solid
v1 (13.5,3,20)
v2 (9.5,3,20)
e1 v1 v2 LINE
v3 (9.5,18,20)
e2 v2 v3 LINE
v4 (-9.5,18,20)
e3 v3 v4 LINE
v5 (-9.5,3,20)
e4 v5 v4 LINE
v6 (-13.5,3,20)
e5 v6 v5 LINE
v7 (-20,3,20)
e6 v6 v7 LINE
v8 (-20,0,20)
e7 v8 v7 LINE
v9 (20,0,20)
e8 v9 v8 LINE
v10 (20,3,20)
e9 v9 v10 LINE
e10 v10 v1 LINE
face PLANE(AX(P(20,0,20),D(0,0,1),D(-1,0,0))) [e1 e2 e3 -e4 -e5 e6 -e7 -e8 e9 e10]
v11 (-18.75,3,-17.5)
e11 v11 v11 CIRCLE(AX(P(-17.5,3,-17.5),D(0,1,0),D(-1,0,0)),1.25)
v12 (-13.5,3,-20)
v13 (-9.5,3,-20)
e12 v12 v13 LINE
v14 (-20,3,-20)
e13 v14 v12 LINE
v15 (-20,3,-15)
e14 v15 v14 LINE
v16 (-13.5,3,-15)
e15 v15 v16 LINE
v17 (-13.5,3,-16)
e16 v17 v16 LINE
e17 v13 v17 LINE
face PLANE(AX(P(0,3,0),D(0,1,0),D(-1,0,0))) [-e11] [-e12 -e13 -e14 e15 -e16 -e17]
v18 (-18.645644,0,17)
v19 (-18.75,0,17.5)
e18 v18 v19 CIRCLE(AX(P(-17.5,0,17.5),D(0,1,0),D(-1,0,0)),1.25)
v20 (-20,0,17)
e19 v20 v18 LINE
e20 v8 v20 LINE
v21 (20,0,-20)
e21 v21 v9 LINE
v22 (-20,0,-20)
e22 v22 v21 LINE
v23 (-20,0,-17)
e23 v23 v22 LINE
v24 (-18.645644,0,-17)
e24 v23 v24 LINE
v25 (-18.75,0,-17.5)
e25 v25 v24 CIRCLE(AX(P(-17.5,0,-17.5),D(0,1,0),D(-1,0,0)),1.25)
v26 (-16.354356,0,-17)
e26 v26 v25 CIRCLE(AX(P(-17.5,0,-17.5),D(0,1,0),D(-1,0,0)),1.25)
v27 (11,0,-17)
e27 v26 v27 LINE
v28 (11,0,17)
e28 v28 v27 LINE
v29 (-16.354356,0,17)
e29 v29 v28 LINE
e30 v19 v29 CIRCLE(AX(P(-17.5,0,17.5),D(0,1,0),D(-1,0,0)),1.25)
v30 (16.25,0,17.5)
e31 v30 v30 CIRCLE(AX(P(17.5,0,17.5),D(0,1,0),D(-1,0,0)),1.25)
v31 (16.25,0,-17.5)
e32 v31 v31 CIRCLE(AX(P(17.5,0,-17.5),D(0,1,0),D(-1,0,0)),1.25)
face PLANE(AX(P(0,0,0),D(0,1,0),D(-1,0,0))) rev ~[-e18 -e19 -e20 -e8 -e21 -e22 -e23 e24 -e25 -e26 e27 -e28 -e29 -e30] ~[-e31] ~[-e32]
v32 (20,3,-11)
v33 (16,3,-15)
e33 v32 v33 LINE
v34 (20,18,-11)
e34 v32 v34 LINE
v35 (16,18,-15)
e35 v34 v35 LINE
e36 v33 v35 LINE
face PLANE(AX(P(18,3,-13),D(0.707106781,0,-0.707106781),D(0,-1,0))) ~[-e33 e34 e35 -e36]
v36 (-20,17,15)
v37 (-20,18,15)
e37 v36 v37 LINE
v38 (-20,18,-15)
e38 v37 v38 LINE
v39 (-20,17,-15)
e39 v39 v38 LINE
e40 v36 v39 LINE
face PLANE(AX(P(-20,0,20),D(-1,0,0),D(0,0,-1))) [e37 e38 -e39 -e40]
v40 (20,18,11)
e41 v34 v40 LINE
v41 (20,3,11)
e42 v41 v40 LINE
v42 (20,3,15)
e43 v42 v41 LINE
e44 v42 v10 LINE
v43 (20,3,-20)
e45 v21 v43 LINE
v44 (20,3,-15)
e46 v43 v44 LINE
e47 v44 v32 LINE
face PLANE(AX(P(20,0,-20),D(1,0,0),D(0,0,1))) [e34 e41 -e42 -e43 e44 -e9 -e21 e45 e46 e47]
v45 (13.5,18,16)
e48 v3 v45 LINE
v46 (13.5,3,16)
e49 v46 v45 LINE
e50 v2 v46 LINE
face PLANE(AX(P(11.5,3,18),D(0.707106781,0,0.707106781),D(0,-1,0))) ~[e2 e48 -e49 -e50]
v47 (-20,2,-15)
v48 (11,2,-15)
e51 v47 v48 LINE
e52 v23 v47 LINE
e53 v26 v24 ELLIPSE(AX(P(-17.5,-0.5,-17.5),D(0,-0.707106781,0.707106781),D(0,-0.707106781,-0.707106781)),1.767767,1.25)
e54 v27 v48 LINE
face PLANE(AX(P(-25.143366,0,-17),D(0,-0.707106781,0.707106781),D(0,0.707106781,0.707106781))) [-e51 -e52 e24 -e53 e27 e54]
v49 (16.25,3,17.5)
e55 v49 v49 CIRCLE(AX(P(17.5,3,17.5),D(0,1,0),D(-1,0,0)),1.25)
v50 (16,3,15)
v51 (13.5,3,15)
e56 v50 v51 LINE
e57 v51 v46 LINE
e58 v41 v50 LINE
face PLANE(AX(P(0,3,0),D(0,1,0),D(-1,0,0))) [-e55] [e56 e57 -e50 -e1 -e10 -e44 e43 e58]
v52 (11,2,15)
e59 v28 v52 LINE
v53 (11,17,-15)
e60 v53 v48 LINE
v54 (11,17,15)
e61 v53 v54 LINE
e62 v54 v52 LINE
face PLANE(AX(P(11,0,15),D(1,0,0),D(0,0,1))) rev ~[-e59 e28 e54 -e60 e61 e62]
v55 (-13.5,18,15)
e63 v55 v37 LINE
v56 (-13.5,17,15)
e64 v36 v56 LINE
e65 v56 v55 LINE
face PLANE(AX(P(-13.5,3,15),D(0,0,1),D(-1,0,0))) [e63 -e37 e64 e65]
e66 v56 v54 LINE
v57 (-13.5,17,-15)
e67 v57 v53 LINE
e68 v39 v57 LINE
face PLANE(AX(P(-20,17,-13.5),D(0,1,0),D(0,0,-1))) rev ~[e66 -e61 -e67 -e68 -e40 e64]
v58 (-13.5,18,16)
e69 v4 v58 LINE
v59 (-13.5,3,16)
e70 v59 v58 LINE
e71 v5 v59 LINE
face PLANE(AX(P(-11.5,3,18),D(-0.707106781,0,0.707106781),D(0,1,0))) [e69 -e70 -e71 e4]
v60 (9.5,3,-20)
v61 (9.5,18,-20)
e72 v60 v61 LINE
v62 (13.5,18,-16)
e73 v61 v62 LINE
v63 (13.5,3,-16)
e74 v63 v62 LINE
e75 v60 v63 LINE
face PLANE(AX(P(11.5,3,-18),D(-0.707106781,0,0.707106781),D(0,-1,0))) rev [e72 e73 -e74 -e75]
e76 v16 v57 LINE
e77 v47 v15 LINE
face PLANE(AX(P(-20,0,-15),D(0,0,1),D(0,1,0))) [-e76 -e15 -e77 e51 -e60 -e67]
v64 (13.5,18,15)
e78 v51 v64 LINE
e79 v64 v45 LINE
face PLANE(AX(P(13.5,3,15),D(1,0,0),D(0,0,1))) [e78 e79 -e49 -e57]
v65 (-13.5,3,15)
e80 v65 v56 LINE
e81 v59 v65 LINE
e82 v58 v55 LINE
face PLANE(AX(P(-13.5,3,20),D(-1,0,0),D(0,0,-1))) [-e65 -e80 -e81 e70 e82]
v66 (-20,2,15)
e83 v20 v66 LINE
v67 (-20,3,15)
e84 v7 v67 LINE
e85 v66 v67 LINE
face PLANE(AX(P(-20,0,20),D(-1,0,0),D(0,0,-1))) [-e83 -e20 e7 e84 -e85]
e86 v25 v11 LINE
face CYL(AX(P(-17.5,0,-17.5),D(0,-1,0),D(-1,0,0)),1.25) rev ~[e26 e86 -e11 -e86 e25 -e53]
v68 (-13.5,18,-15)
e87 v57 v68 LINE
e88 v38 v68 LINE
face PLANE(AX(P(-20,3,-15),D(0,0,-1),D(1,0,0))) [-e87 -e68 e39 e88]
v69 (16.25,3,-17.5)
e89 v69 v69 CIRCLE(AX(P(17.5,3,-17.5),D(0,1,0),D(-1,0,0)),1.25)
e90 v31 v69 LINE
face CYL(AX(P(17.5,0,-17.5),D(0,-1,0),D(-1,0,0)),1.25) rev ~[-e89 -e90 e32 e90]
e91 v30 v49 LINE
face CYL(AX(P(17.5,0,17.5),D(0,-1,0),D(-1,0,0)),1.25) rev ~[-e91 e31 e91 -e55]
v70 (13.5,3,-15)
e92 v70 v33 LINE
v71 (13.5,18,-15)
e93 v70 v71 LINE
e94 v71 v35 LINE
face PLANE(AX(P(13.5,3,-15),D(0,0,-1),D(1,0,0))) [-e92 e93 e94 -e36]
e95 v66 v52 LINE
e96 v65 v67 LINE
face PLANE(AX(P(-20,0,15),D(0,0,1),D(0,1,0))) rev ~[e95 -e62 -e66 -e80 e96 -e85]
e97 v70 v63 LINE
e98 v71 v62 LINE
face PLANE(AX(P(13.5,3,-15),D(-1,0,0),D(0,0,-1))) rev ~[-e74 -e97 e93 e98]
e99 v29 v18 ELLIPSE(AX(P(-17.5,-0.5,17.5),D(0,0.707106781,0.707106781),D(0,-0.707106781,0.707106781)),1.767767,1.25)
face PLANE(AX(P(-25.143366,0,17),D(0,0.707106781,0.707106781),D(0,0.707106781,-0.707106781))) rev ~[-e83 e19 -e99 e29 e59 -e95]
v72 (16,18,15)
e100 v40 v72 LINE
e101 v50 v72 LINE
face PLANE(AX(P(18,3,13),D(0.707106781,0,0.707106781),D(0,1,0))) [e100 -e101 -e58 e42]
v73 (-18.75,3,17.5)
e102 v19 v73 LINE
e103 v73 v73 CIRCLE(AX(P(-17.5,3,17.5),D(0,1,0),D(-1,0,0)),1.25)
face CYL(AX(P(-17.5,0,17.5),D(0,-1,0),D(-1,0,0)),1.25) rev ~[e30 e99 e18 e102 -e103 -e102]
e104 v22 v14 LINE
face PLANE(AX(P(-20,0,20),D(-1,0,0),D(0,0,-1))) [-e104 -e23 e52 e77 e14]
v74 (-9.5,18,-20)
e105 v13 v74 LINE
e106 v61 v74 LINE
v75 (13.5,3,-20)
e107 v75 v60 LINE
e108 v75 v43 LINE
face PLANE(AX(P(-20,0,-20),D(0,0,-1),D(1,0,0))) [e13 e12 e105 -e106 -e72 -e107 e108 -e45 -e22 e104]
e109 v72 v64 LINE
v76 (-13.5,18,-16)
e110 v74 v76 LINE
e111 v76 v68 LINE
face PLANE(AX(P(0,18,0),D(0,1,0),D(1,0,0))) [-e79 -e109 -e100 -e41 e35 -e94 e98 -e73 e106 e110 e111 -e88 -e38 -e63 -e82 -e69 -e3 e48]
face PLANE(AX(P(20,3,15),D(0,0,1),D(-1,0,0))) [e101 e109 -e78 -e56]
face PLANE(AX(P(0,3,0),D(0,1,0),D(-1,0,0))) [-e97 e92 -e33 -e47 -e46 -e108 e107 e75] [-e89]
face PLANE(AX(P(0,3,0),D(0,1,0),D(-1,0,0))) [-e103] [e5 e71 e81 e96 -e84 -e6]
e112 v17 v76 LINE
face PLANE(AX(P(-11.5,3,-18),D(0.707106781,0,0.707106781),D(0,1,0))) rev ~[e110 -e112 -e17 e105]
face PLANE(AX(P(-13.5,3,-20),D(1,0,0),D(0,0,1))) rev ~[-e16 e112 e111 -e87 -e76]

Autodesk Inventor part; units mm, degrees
ref_plane "YZ Plane" through (0, 0, 0) normal (1, 0, 0) x (0, 1, 0)
ref_plane "XZ Plane" through (0, 0, 0) normal (0, 1, 0) x (-1, 0, 0)
ref_plane "XY Plane" through (0, 0, 0) normal (0, 0, 1) x (1, 0, 0)
sketch "Sketch1" plane through (0, 0, 0) normal (0, 1, 0) x (-1, 0, 0)
  line L0 (-17.5, 17.5) -> (17.5, -17.5) construction
  line L1 (17.5, 17.5) -> (-17.5, -17.5) construction
  circle A0 centre (17.5, 17.5) radius 1.25
  circle A1 centre (-17.5, 17.5) radius 1.25
  circle A2 centre (17.5, -17.5) radius 1.25
  circle A3 centre (-17.5, -17.5) radius 1.25
  line L2 (-20, 20) -> (20, 20)
  line L3 (20, 20) -> (20, -20)
  line L4 (20, -20) -> (-20, -20)
  line L5 (-20, -20) -> (-20, 20)
  line L6 (-20, 20) -> (20, -20) construction
  line L7 (20, 20) -> (-20, -20) construction
  point P0 (0, 0)
  dimension "d0" = 35
  dimension "d1" = 35
  dimension "d2" = 2.5
  dimension "d3" = 2.5
  dimension "d4" = 2.5
  dimension "d5" = 2.5
  dimension "d6" = 40
  dimension "d7" = 40
extrude "Extrusion2" add sketch "Sketch1" along normal blind 3
sketch "Sketch2" plane through (0, 3, 0) normal (0, 1, 0) x (1, 0, 0)
  line L0 (20, -15) -> (-20, -15)
  line L1 (-20, -15) -> (-20, 15)
  line L2 (-20, 15) -> (20, 15)
  line L3 (20, 15) -> (20, -15)
  line L4 (20, -15) -> (-20, 15) construction
  line L5 (-20, -15) -> (20, 15) construction
  line L6 (-13.5, 10) -> (13.5, 10)
  line L7 (13.5, 10) -> (13.5, 20)
  line L8 (13.5, 20) -> (-13.5, 20)
  line L9 (-13.5, 20) -> (-13.5, 10)
  line L10 (-13.5, 10) -> (13.5, 20) construction
  line L11 (13.5, 10) -> (-13.5, 20) construction
  line L12 (-13.5, -10) -> (13.5, -10)
  line L13 (13.5, -10) -> (13.5, -20)
  line L14 (13.5, -20) -> (-13.5, -20)
  line L15 (-13.5, -20) -> (-13.5, -10)
  line L16 (-13.5, -10) -> (13.5, -20) construction
  line L17 (13.5, -10) -> (-13.5, -20) construction
  point P0 (0, 0)
  point P1 (0, 15)
  point P2 (0, -15)
  point P3 (13.5, -15)
  point P4 (-13.5, -15)
  point P5 (-13.5, 15)
  point P6 (13.5, 15)
  dimension "d12" = 40
  dimension "d13" = 30
  dimension "d27" = 27
  dimension "d28" = 10
  dimension "d29" = 27
  dimension "d30" = 10
extrude "Extrusion3" add sketch "Sketch2" along normal blind 15
sketch "Sketch4" plane through (-20, 0, -20) normal (-1, 0, 0) x (0, 0, 1)
  line L0 (0, 0) -> (40, 0) projected
  line L1 (40, 0) -> (40, 3) projected
  line L2 (35, 3) -> (40, 3) projected
  line L3 (35, 3) -> (35, 18) projected
  line L4 (5, 18) -> (35, 18) projected
  line L5 (5, 3) -> (5, 18) projected
  line L6 (0, 3) -> (5, 3) projected
  line L7 (0, 0) -> (0, 3) projected
  line L8 (33.5, -17) -> (6.5, -17)
  line L9 (6.5, -17) -> (6.5, 17)
  line L10 (6.5, 17) -> (33.5, 17)
  line L11 (33.5, 17) -> (33.5, -17)
  line L12 (33.5, -17) -> (6.5, 17) construction
  line L13 (6.5, -17) -> (33.5, 17) construction
  line L14 (5, 18) -> (6.5, 18)
  line L15 (6.5, 18) -> (6.5, 0)
  line L16 (6.5, 0) -> (5, 0)
  line L17 (5, 0) -> (5, 18)
  line L18 (5, 18) -> (35, 18) projected
  line L19 (35, 18) -> (33.5, 18)
  line L20 (33.5, 18) -> (33.5, 0)
  line L21 (33.5, 0) -> (35, 0)
  line L22 (35, 0) -> (35, 18)
  line L23 (6.5, 17) -> (5, 17)
  line L24 (33.5, 17) -> (35, 17)
  point P0 (20, 0)
  dimension "d20" = 27
  dimension "d21" = 34
extrude "Extrusion5" cut sketch "Sketch4" against normal blind 31 contours L17 L5 L23 L9 L0 | L9 L10 L11 L0 | L11 L24 L3 L22 L0
chamfer "Chamfer2" distance 2 angle 45 2 edges at (-4.5, 0, -15) (-4.5, 0, 15)
chamfer "Chamfer3" distance 4 angle 45 6 edges at (20, 10.5, -15) (13.5, 10.5, -20) (-13.5, 10.5, -20) (-13.5, 10.5, 20) (13.5, 10.5, 20) (20, 10.5, 15)
properties part number "obudowa_gps_bt" material "ABS Plastic"
